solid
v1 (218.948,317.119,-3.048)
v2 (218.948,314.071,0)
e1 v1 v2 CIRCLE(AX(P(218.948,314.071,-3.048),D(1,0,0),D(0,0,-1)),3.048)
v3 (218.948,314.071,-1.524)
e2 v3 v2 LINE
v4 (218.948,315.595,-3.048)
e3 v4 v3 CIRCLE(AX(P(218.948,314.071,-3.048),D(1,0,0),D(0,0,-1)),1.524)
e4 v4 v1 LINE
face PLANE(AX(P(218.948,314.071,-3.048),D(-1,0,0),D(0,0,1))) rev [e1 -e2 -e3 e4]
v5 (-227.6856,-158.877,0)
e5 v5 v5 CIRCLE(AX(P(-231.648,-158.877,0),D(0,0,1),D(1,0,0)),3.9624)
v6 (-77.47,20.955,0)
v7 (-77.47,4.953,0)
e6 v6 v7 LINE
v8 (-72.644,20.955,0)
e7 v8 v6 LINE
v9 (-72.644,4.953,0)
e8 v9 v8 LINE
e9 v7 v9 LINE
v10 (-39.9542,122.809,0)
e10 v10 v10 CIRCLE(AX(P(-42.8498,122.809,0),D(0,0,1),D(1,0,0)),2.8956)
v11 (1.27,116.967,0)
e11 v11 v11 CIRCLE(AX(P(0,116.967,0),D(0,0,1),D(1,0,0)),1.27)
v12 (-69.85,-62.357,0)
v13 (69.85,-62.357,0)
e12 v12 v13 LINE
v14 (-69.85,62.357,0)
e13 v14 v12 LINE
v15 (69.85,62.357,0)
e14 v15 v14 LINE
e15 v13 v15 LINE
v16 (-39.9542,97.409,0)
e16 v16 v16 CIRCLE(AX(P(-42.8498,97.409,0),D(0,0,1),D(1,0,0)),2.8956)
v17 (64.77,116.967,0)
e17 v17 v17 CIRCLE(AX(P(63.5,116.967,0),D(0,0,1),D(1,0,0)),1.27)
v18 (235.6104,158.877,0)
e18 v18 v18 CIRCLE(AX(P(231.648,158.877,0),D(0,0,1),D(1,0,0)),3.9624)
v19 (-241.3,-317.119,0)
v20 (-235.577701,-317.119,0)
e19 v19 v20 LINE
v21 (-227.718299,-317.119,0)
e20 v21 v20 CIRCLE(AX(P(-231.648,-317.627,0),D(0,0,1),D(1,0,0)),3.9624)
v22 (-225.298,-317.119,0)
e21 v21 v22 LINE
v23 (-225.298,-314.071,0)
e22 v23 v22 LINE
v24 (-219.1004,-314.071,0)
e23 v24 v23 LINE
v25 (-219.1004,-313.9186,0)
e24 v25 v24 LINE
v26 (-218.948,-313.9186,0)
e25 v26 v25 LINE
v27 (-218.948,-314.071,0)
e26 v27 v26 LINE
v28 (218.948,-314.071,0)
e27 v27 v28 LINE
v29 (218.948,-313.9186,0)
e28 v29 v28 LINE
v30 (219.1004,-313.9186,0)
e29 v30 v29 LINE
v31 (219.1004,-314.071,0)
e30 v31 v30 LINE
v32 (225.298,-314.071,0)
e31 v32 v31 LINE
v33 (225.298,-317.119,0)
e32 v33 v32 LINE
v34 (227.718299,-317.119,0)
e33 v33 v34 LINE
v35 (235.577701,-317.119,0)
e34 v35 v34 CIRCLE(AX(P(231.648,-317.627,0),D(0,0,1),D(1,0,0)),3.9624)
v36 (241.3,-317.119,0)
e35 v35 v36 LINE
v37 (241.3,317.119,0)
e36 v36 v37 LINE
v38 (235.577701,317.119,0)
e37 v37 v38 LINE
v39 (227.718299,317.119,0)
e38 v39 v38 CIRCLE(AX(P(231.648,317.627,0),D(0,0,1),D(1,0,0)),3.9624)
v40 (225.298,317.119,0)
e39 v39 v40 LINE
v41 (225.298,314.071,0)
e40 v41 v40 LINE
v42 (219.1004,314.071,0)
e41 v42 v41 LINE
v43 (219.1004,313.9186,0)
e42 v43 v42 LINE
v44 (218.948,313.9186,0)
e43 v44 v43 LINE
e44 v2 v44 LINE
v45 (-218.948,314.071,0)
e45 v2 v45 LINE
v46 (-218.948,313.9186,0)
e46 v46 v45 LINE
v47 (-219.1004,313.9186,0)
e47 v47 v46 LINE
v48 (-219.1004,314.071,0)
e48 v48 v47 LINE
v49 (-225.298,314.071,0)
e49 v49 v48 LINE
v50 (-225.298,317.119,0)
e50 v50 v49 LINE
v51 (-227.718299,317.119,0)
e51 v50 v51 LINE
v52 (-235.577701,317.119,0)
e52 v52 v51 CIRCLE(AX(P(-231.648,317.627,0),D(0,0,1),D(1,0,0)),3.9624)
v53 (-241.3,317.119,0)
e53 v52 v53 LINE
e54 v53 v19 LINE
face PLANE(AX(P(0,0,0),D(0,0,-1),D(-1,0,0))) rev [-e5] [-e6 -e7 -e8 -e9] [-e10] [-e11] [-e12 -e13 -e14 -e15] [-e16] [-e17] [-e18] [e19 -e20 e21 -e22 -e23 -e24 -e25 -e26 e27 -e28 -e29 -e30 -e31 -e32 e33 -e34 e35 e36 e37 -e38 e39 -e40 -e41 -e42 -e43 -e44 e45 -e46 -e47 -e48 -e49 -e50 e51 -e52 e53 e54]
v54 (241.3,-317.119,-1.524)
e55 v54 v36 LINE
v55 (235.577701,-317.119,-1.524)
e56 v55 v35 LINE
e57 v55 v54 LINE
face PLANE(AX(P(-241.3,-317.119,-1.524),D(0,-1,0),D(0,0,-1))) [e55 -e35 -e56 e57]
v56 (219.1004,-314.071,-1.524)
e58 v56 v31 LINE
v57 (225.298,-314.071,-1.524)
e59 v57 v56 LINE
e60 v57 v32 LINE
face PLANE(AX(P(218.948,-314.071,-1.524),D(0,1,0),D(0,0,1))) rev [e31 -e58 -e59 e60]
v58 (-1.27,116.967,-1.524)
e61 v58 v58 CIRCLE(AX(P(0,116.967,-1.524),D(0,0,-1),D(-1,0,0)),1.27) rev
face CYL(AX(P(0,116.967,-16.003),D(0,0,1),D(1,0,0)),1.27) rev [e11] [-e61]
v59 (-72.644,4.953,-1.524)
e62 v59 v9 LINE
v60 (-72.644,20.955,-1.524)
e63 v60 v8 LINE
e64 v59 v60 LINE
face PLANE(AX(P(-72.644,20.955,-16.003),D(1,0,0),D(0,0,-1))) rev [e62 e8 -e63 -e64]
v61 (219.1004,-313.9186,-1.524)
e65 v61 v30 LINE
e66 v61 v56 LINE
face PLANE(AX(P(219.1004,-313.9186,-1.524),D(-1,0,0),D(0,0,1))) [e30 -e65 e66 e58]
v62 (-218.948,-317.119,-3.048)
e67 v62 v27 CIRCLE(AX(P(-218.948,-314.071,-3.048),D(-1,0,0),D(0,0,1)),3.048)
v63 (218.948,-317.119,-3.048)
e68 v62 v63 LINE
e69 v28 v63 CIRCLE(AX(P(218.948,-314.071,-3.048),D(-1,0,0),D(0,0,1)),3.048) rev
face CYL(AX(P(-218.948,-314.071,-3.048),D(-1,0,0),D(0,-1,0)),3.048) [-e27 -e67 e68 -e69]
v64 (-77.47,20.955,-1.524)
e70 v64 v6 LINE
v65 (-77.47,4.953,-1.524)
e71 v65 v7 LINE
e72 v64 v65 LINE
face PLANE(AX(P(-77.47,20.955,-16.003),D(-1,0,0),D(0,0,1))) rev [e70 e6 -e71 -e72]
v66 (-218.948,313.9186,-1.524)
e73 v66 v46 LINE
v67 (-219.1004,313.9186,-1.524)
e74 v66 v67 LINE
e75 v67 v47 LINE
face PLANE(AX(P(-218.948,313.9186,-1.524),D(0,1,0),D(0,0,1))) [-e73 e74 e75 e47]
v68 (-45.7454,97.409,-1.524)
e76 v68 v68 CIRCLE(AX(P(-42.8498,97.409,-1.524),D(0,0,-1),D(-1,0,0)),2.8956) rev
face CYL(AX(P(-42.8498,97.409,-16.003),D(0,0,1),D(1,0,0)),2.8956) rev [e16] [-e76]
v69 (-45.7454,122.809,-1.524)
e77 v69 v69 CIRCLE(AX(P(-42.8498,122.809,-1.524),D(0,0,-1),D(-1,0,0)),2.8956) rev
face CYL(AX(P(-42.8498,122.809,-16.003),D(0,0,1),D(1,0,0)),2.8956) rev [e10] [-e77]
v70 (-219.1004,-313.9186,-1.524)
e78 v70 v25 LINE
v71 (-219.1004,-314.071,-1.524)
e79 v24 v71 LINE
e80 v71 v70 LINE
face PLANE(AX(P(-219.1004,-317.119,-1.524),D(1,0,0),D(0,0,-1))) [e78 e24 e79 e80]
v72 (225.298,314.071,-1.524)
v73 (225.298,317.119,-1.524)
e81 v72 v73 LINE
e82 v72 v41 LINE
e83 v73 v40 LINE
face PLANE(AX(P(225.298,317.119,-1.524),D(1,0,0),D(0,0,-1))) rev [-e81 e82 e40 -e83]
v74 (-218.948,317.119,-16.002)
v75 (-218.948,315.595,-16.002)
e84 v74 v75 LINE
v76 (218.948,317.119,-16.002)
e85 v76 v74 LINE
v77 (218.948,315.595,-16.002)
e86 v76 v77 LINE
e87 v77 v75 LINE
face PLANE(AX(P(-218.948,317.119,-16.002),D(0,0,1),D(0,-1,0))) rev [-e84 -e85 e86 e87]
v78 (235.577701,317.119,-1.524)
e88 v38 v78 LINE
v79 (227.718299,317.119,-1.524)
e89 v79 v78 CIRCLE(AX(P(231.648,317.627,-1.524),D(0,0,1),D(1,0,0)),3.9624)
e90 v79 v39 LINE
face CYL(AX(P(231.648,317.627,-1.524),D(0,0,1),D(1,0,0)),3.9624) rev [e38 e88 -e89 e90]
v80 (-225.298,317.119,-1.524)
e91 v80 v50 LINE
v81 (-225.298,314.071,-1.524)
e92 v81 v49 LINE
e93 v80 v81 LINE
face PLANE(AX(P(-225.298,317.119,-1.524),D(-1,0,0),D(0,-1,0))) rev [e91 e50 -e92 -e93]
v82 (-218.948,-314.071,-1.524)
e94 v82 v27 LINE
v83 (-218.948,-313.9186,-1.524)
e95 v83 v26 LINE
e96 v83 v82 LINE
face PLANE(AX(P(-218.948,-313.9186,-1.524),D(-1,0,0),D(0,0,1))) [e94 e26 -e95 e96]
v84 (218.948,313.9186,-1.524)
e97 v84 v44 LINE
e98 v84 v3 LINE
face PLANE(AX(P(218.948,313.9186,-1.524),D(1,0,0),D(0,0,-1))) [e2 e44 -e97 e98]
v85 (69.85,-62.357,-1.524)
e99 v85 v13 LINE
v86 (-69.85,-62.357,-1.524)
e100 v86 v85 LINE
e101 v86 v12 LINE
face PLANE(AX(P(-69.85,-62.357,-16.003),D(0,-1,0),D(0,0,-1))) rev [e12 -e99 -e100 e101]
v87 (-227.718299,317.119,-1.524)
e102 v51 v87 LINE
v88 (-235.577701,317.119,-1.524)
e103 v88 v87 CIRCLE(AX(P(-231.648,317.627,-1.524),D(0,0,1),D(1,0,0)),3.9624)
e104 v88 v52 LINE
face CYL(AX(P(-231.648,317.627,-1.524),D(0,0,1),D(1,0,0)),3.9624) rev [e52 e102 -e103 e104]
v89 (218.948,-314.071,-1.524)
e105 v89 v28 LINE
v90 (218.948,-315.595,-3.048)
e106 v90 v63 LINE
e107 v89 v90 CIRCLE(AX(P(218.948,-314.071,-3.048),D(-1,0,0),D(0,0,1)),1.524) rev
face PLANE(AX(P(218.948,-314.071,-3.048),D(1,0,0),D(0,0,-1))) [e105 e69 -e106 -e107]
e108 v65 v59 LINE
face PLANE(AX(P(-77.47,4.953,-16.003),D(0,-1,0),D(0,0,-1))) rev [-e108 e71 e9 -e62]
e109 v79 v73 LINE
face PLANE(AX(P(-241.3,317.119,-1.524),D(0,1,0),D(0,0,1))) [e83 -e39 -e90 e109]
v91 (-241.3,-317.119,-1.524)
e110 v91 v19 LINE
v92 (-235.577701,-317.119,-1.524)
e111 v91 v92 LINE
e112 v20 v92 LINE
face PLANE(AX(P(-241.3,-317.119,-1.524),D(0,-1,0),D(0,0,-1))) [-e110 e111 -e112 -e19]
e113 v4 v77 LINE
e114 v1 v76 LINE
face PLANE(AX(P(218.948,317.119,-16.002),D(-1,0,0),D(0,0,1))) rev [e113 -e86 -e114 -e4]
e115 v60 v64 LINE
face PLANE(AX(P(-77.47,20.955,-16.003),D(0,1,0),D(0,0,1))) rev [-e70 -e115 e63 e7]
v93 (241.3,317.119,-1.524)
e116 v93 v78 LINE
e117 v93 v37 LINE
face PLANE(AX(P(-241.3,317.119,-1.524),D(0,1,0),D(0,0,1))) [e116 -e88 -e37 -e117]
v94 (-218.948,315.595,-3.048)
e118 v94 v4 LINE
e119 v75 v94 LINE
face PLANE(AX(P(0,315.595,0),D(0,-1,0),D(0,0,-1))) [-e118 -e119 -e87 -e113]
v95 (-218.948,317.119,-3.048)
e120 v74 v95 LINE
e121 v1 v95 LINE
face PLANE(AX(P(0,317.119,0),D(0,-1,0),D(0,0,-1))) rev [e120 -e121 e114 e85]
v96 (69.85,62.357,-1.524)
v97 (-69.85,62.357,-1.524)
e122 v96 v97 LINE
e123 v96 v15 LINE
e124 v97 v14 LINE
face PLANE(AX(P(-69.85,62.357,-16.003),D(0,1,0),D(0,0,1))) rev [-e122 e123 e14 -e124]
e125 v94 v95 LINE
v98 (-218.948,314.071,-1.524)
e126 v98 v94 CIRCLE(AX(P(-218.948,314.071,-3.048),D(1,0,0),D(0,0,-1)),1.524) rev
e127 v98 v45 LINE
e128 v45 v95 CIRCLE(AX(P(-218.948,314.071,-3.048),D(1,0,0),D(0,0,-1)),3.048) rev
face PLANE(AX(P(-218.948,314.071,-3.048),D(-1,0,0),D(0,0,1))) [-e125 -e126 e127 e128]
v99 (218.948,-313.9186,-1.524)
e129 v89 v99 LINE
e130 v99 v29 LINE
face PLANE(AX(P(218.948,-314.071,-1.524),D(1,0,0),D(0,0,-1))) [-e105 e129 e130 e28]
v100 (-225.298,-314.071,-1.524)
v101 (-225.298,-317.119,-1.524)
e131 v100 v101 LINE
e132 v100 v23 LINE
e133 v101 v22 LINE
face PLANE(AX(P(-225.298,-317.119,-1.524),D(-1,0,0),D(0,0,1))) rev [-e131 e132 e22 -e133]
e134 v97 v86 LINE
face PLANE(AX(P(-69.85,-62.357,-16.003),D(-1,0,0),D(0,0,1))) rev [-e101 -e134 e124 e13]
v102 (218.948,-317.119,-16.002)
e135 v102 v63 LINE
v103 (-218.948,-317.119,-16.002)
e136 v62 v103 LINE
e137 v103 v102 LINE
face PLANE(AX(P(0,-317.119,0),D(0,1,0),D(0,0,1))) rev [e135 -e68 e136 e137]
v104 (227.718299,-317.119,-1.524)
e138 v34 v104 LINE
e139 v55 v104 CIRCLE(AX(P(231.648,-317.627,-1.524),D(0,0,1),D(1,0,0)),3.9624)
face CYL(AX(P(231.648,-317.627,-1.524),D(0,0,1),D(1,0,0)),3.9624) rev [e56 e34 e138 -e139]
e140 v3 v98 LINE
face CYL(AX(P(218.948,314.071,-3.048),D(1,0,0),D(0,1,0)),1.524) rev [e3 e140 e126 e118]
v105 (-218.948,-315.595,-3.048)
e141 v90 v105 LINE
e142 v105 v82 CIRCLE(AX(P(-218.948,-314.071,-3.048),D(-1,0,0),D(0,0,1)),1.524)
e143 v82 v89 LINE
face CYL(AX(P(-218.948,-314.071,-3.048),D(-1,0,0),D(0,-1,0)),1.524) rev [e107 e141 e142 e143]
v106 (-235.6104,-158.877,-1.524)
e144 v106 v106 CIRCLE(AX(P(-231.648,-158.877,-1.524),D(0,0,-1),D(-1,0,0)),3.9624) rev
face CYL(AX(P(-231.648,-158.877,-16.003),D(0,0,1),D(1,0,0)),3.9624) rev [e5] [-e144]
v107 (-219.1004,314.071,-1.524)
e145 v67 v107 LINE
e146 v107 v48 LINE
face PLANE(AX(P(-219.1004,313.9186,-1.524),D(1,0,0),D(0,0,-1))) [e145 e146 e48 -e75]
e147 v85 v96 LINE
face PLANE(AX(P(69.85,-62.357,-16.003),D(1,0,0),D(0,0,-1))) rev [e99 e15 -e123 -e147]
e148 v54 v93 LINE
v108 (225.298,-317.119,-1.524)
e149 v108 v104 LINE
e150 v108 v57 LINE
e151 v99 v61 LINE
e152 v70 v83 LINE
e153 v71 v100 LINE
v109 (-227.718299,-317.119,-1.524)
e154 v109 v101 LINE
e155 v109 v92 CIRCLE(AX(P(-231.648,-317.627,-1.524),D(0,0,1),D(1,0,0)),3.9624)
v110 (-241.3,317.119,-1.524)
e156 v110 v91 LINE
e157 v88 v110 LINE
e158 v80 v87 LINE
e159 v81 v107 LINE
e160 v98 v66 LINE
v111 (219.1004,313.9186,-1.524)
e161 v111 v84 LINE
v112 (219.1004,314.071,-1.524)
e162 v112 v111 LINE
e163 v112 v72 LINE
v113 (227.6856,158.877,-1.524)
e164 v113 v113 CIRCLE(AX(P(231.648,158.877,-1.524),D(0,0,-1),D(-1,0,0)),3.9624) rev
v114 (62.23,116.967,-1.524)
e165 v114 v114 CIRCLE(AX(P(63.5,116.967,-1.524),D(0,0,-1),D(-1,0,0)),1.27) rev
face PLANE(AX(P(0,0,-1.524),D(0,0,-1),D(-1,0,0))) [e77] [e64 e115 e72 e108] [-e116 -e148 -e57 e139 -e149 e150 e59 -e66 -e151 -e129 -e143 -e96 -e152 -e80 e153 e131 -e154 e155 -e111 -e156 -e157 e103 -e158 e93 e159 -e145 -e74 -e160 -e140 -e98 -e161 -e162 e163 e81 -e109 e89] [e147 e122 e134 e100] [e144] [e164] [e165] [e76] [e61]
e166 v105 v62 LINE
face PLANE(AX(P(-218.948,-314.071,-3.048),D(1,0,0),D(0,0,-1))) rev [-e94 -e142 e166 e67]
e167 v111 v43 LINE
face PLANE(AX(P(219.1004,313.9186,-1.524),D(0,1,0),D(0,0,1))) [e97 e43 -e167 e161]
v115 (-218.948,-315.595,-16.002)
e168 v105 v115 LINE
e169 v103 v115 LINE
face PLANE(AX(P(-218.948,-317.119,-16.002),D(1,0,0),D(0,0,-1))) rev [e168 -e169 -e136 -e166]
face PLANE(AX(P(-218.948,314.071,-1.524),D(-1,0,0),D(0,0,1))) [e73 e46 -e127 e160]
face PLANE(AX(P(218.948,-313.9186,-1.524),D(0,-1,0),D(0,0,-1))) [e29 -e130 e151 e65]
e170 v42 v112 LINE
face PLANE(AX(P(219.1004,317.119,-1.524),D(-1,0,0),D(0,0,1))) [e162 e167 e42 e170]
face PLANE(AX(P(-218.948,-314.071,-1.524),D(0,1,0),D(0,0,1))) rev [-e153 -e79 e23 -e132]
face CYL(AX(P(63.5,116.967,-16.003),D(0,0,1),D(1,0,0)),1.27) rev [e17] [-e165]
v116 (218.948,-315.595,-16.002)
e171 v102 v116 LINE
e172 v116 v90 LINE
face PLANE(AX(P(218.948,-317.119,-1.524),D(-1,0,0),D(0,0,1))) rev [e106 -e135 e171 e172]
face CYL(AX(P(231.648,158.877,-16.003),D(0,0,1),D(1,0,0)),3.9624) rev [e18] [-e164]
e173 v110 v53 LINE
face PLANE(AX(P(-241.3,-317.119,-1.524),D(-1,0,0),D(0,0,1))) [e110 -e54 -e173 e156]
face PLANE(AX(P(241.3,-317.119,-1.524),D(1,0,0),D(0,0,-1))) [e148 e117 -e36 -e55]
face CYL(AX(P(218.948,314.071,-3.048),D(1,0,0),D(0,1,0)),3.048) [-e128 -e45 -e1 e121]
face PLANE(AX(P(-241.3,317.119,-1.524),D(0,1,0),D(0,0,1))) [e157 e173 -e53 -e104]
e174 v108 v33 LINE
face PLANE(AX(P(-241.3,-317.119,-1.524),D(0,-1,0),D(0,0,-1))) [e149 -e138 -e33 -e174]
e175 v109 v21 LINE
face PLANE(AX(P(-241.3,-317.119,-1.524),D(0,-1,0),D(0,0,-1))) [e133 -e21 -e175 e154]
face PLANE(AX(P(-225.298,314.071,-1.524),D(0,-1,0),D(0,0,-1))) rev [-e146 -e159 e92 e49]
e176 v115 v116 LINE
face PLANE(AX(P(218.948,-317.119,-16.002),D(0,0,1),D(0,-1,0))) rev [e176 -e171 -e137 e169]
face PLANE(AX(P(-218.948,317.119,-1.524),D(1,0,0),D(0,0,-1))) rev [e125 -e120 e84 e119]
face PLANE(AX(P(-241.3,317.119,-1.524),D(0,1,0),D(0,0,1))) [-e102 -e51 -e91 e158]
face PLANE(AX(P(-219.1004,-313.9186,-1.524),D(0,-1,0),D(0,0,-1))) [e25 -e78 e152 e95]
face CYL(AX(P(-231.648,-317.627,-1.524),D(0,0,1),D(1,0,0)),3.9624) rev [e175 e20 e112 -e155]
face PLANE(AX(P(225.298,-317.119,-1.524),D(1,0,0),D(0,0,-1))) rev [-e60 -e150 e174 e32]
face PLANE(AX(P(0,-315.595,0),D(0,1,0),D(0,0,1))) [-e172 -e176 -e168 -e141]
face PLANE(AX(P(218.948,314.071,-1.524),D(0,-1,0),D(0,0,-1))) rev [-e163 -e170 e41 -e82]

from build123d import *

# Parameters (mm, degrees)
CROQUIS1_W                   = 482.6
CROQUIS1_H                   = 634.238
BRIDA_BASE1_DEPTH            = 1.524
CROQUIS6_R                   = 3.9624
CROQUIS6_W                   = 6.35
CROQUIS6_H                   = 3.048
CORTAR_EXTRUIR1_DEPTH        = 399.487732229
BRIDA_START                  = -218.948
BRIDA_DE_ARISTA1_DEPTH       = 437.896
BRIDA_START_2                = -219.1004
BRIDA_DE_ARISTA1_2_OUTLINE_W = 0.1524
BRIDA_DE_ARISTA1_2_OUTLINE_H = 1.524
BRIDA_DE_ARISTA1_2_DEPTH     = 0.1524
BRIDA_START_3                = 218.948
BRIDA_DE_ARISTA1_3_OUTLINE_W = 0.1524
BRIDA_DE_ARISTA1_3_OUTLINE_H = 1.524
BRIDA_DE_ARISTA1_3_DEPTH     = 0.1524
BRIDA_DE_ARISTA1_4_DEPTH     = 437.896
CORTAR_EXTRUIR2_REACH        = 400.806
CROQUIS13_R                  = 3.9624
CROQUIS13_R_2                = 2.8956
CROQUIS13_R_3                = 1.27
CROQUIS13_W                  = 139.7
CROQUIS13_H                  = 124.714
CROQUIS13_W_2                = 4.826
CROQUIS13_H_2                = 16.002


# Read off the part's stored shape, not the designer's step: Brida de arista1
# Sheet-metal steps are written as plain solids
with BuildPart() as part:
    # Croquis1 → Brida base1 (new body)
    with BuildSketch(Plane.XY):
        Rectangle(CROQUIS1_W, CROQUIS1_H)
    extrude(amount=-BRIDA_BASE1_DEPTH)

    # Croquis6 → Cortar-Extruir1 (cut, through all)
    with BuildSketch(Plane.XY):
        with Locations((231.648, 317.627)):
            Circle(CROQUIS6_R)
        with Locations((-231.648, 317.627)):
            Circle(CROQUIS6_R)
        with Locations((-231.648, -317.627)):
            Circle(CROQUIS6_R)
        with Locations((231.648, -317.627)):
            Circle(CROQUIS6_R)
        with Locations((-222.123, 315.595)):
            Rectangle(CROQUIS6_W, CROQUIS6_H)
        with Locations((222.123, 315.595)):
            Rectangle(CROQUIS6_W, CROQUIS6_H)
        with Locations((-222.123, -315.595)):
            Rectangle(CROQUIS6_W, CROQUIS6_H)
        with Locations((222.123, -315.595)):
            Rectangle(CROQUIS6_W, CROQUIS6_H)
    extrude(amount=-CORTAR_EXTRUIR1_DEPTH, mode=Mode.SUBTRACT)

    # Brida de arista1 outline → Brida de arista1 (cut)
    with BuildSketch(Plane.YZ.offset(BRIDA_START)):
        with BuildLine():
            ThreePointArc((-316.710645431, -1.524), (-315.595, -0.408354569), (-314.071, 0))
            Line((-314.071, 0), (-317.119, 0))
            Line((-317.119, 0), (-317.119, -1.524))
            Line((-317.119, -1.524), (-316.710645431, -1.524))
        make_face()
        with BuildLine():
            Line((317.119, 0), (314.071, 0))
            ThreePointArc((314.071, 0), (315.595, -0.408354569), (316.710645431, -1.524))
            Line((316.710645431, -1.524), (317.119, -1.524))
            Line((317.119, -1.524), (317.119, 0))
        make_face()
    extrude(amount=BRIDA_DE_ARISTA1_DEPTH, mode=Mode.SUBTRACT)

    # Brida de arista1 2 outline → Brida de arista1 2 (cut)
    with BuildSketch(Plane.YZ.offset(BRIDA_START_2)):
        with Locations((-313.9948, -0.762)):
            Rectangle(BRIDA_DE_ARISTA1_2_OUTLINE_W, BRIDA_DE_ARISTA1_2_OUTLINE_H)
        with Locations((313.9948, -0.762)):
            Rectangle(BRIDA_DE_ARISTA1_2_OUTLINE_W, BRIDA_DE_ARISTA1_2_OUTLINE_H)
    extrude(amount=BRIDA_DE_ARISTA1_2_DEPTH, mode=Mode.SUBTRACT)

    # Brida de arista1 3 outline → Brida de arista1 3 (cut)
    with BuildSketch(Plane.YZ.offset(BRIDA_START_3)):
        with Locations((-313.9948, -0.762)):
            Rectangle(BRIDA_DE_ARISTA1_3_OUTLINE_W, BRIDA_DE_ARISTA1_3_OUTLINE_H)
        with Locations((313.9948, -0.762)):
            Rectangle(BRIDA_DE_ARISTA1_3_OUTLINE_W, BRIDA_DE_ARISTA1_3_OUTLINE_H)
    extrude(amount=BRIDA_DE_ARISTA1_3_DEPTH, mode=Mode.SUBTRACT)

    # Brida de arista1 4 outline → Brida de arista1 4 (add)
    with BuildSketch(Plane.YZ.offset(BRIDA_START)):
        with BuildLine():
            ThreePointArc((-315.595, -3.048), (-315.148630735, -1.970369265), (-314.071, -1.524))
            Line((-314.071, -1.524), (-316.710645431, -1.524))
            ThreePointArc((-316.710645431, -1.524), (-317.015141918, -2.259119551), (-317.119, -3.048))
            Line((-317.119, -3.048), (-317.119, -16.002))
            Line((-317.119, -16.002), (-315.595, -16.002))
            Line((-315.595, -16.002), (-315.595, -3.048))
        make_face()
        with BuildLine():
            Line((316.710645431, -1.524), (314.071, -1.524))
            ThreePointArc((314.071, -1.524), (315.148630735, -1.970369265), (315.595, -3.048))
            Line((315.595, -3.048), (315.595, -16.002))
            Line((315.595, -16.002), (317.119, -16.002))
            Line((317.119, -16.002), (317.119, -3.048))
            ThreePointArc((317.119, -3.048), (317.015141918, -2.259119551), (316.710645431, -1.524))
        make_face()
    extrude(amount=BRIDA_DE_ARISTA1_4_DEPTH)

    # Croquis13 → Cortar-Extruir2 (cut, up to next)
    with BuildSketch(Plane.XY, mode=Mode.PRIVATE) as cortar_extruir2_sk1:
        with Locations((-231.648, -158.877)):
            Circle(CROQUIS13_R)
    cortar_extruir2_tool1 = extrude(cortar_extruir2_sk1.sketch, amount=-CORTAR_EXTRUIR2_REACH, mode=Mode.PRIVATE) & part.part
    # Croquis13 → Cortar-Extruir2 (cut, up to next)
    with BuildSketch(Plane.XY, mode=Mode.PRIVATE) as cortar_extruir2_sk2:
        with Locations((231.648, 158.877)):
            Circle(CROQUIS13_R)
    cortar_extruir2_tool2 = extrude(cortar_extruir2_sk2.sketch, amount=-CORTAR_EXTRUIR2_REACH, mode=Mode.PRIVATE) & part.part
    # Croquis13 → Cortar-Extruir2 (cut, up to next)
    with BuildSketch(Plane.XY, mode=Mode.PRIVATE) as cortar_extruir2_sk3:
        with Locations((-42.8498, 97.409)):
            Circle(CROQUIS13_R_2)
    cortar_extruir2_tool3 = extrude(cortar_extruir2_sk3.sketch, amount=-CORTAR_EXTRUIR2_REACH, mode=Mode.PRIVATE) & part.part
    # Croquis13 → Cortar-Extruir2 (cut, up to next)
    with BuildSketch(Plane.XY, mode=Mode.PRIVATE) as cortar_extruir2_sk4:
        with Locations((-42.8498, 122.809)):
            Circle(CROQUIS13_R_2)
    cortar_extruir2_tool4 = extrude(cortar_extruir2_sk4.sketch, amount=-CORTAR_EXTRUIR2_REACH, mode=Mode.PRIVATE) & part.part
    # Croquis13 → Cortar-Extruir2 (cut, up to next)
    with BuildSketch(Plane.XY, mode=Mode.PRIVATE) as cortar_extruir2_sk5:
        with Locations((0, 116.967)):
            Circle(CROQUIS13_R_3)
    cortar_extruir2_tool5 = extrude(cortar_extruir2_sk5.sketch, amount=-CORTAR_EXTRUIR2_REACH, mode=Mode.PRIVATE) & part.part
    # Croquis13 → Cortar-Extruir2 (cut, up to next)
    with BuildSketch(Plane.XY, mode=Mode.PRIVATE) as cortar_extruir2_sk6:
        with Locations((63.5, 116.967)):
            Circle(CROQUIS13_R_3)
    cortar_extruir2_tool6 = extrude(cortar_extruir2_sk6.sketch, amount=-CORTAR_EXTRUIR2_REACH, mode=Mode.PRIVATE) & part.part
    # Croquis13 → Cortar-Extruir2 (cut, up to next)
    with BuildSketch(Plane.XY, mode=Mode.PRIVATE) as cortar_extruir2_sk7:
        Rectangle(CROQUIS13_W, CROQUIS13_H)
    cortar_extruir2_tool7 = extrude(cortar_extruir2_sk7.sketch, amount=-CORTAR_EXTRUIR2_REACH, mode=Mode.PRIVATE) & part.part
    # Croquis13 → Cortar-Extruir2 (cut, up to next)
    with BuildSketch(Plane.XY, mode=Mode.PRIVATE) as cortar_extruir2_sk8:
        with Locations((-75.057, 12.954)):
            Rectangle(CROQUIS13_W_2, CROQUIS13_H_2)
    cortar_extruir2_tool8 = extrude(cortar_extruir2_sk8.sketch, amount=-CORTAR_EXTRUIR2_REACH, mode=Mode.PRIVATE) & part.part
    add(cortar_extruir2_tool1.solids().sort_by_distance((-231.648, -158.877, 0))[0], mode=Mode.SUBTRACT)
    add(cortar_extruir2_tool2.solids().sort_by_distance((231.648, 158.877, 0))[0], mode=Mode.SUBTRACT)
    add(cortar_extruir2_tool3.solids().sort_by_distance((-42.8498, 97.409, 0))[0], mode=Mode.SUBTRACT)
    add(cortar_extruir2_tool4.solids().sort_by_distance((-42.8498, 122.809, 0))[0], mode=Mode.SUBTRACT)
    add(cortar_extruir2_tool5.solids().sort_by_distance((0, 116.967, 0))[0], mode=Mode.SUBTRACT)
    add(cortar_extruir2_tool6.solids().sort_by_distance((63.5, 116.967, 0))[0], mode=Mode.SUBTRACT)
    add(cortar_extruir2_tool7.solids().sort_by_distance((0, 0, 0))[0], mode=Mode.SUBTRACT)
    add(cortar_extruir2_tool8.solids().sort_by_distance((-75.057, 12.954, 0))[0], mode=Mode.SUBTRACT)


solid = part.part
